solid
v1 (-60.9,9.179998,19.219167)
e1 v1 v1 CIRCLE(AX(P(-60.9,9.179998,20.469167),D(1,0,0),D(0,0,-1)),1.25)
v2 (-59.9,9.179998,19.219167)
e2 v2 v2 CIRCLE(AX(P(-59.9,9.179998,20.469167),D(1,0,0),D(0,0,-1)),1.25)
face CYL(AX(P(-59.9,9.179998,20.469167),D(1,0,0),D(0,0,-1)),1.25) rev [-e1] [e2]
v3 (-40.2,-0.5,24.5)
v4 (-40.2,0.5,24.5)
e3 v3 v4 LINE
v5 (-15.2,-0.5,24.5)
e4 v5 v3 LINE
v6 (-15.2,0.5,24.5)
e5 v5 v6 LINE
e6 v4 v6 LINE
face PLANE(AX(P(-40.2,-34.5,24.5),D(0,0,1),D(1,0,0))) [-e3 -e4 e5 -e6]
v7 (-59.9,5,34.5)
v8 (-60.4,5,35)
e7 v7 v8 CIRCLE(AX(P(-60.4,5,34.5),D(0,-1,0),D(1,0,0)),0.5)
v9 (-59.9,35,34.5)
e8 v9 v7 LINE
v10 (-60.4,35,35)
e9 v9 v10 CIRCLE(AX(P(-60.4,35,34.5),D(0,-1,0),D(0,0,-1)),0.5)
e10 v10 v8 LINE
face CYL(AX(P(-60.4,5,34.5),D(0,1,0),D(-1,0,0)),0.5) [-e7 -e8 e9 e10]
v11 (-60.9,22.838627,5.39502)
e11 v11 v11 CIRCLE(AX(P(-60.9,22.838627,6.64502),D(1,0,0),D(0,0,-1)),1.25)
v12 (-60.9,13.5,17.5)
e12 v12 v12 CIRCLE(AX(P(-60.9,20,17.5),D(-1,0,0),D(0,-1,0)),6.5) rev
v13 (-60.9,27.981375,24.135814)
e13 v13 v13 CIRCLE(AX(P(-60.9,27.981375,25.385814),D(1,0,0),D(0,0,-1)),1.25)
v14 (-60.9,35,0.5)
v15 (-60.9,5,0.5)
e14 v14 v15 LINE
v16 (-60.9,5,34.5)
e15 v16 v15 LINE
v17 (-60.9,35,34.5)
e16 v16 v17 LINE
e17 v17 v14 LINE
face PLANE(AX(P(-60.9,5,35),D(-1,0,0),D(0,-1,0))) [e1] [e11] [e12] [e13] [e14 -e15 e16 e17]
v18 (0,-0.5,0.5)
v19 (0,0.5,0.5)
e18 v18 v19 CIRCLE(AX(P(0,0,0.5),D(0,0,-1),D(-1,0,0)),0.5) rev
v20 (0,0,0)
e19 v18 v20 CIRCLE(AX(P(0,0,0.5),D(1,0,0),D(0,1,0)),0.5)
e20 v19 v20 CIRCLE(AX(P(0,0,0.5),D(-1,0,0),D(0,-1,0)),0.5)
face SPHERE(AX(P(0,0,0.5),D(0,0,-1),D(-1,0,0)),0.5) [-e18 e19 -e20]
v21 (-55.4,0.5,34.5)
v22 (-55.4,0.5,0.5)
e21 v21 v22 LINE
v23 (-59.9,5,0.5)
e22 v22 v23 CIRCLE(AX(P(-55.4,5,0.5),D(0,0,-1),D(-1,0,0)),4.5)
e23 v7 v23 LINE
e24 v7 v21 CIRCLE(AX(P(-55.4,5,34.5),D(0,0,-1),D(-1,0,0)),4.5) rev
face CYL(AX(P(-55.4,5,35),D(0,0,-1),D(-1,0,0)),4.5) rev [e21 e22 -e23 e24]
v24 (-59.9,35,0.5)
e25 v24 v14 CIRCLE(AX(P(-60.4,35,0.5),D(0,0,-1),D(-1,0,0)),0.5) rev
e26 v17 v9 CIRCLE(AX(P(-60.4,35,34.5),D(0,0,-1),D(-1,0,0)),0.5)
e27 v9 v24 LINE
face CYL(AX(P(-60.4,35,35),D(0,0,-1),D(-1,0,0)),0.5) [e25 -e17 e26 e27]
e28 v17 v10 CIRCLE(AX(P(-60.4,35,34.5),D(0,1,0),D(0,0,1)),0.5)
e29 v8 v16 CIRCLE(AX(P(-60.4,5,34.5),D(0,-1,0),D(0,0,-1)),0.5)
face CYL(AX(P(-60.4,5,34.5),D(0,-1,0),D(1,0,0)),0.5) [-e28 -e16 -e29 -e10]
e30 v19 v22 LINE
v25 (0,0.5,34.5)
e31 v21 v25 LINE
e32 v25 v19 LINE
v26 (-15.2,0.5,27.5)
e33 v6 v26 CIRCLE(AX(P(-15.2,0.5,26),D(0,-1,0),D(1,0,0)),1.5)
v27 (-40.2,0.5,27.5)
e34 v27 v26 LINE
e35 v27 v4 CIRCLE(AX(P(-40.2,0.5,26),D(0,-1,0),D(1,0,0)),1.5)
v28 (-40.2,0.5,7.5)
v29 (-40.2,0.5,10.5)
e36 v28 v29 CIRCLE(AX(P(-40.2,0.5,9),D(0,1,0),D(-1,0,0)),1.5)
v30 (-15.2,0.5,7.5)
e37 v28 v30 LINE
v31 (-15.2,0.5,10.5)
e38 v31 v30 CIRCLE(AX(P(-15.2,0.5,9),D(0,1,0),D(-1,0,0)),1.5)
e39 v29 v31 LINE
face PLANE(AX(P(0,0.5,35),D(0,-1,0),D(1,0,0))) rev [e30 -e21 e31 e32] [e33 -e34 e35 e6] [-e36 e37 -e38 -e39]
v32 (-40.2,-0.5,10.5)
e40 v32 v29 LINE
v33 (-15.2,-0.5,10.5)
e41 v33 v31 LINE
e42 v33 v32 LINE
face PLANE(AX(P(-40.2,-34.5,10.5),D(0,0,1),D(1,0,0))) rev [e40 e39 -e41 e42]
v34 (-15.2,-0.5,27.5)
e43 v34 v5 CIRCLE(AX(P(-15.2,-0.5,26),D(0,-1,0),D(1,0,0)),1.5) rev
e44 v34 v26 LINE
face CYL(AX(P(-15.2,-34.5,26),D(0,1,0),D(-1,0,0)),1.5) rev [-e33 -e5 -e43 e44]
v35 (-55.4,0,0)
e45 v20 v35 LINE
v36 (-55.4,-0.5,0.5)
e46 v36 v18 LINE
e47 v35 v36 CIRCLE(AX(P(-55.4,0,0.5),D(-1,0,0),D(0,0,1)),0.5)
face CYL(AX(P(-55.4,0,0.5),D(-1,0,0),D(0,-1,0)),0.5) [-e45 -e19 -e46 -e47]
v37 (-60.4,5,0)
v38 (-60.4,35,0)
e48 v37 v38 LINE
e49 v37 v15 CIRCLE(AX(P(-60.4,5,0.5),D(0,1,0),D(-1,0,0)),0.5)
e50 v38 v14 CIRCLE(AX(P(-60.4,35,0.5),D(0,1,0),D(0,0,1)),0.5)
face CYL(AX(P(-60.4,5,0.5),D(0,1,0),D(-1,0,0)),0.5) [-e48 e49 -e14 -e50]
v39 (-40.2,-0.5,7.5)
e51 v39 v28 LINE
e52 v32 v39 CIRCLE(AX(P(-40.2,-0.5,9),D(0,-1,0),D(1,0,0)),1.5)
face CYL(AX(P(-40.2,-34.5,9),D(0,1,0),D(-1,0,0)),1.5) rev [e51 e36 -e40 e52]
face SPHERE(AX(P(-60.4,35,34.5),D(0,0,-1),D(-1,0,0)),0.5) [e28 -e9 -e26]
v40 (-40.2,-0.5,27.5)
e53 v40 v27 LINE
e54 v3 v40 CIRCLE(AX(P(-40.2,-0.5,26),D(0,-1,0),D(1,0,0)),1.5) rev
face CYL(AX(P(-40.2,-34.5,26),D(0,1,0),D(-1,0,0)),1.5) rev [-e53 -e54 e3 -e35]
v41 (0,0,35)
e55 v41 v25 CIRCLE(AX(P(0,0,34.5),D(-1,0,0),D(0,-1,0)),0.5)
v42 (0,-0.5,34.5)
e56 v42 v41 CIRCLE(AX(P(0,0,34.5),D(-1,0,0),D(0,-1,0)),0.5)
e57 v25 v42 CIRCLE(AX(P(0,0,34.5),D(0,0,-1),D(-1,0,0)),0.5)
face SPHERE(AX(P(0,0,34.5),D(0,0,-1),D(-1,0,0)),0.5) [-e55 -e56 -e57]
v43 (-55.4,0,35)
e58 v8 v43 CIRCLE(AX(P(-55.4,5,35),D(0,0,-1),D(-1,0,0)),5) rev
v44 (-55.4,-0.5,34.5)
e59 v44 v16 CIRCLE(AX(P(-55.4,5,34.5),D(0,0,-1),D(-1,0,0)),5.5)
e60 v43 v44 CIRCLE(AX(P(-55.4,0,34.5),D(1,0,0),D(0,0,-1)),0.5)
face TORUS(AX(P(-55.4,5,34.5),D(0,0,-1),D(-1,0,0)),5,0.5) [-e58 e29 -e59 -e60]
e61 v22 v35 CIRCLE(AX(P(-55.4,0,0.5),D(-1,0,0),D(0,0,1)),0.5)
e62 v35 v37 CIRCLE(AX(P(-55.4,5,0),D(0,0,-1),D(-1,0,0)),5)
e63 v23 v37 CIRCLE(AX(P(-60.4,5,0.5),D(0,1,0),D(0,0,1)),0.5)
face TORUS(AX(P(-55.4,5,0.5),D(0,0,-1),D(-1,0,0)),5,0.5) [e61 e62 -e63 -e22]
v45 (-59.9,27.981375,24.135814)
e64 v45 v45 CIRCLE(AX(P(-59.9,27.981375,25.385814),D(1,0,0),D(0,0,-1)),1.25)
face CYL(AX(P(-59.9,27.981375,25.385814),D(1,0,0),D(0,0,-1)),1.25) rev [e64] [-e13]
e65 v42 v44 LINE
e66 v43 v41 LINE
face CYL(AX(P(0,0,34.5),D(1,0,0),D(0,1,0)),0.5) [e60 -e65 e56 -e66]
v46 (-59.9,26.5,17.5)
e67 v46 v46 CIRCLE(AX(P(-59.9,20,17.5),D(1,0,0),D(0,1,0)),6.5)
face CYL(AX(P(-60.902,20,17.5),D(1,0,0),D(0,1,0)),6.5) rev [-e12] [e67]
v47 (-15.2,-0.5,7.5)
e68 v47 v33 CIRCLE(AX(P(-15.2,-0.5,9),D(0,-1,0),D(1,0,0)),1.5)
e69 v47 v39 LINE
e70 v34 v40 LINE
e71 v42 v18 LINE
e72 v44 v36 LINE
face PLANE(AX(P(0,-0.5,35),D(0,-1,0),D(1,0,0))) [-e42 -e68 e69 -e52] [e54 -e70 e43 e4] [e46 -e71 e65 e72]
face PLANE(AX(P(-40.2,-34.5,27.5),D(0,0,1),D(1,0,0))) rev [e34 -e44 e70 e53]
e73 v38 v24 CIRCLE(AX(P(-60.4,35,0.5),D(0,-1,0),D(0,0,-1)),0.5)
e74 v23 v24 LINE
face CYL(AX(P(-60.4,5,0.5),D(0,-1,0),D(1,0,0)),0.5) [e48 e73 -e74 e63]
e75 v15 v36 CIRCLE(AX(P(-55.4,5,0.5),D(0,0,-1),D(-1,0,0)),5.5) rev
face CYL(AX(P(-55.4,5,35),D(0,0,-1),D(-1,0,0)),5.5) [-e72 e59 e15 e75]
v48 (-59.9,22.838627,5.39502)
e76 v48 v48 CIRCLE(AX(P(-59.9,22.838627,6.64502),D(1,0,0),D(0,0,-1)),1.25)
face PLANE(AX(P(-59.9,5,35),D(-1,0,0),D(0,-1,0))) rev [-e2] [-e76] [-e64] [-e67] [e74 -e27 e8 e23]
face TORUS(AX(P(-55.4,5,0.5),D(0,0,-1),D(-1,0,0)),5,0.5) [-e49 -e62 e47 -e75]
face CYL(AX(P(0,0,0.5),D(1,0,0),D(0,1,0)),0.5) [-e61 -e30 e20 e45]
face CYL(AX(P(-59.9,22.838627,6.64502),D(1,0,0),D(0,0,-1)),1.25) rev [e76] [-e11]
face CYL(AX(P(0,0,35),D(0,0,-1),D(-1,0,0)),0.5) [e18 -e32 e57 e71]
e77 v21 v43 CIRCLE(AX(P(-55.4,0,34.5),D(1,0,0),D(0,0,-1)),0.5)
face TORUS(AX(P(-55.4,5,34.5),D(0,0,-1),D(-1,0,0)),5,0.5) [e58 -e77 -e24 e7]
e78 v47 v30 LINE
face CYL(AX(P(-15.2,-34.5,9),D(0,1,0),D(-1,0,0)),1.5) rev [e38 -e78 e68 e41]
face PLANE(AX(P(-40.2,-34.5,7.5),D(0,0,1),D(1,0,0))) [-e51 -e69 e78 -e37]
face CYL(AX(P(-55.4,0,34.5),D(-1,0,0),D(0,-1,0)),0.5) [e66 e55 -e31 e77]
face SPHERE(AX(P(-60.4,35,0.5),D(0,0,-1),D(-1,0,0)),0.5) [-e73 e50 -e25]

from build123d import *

# Parameters (mm, degrees)
BOSS_EXTRUDE1_DEPTH   = 35
CUT_EXTRUDE1_REACH    = 80.316
SKETCH3_R             = 6.5
FILLET1_R             = 0.5
CUT_EXTRUDE3_DEPTH    = 35
F_2_5MM_DOWEL_HOLE1_D = 2.5


with BuildPart() as part:
    # Sketch1 → Boss-Extrude1 (new body)
    with BuildSketch(Plane.XY):
        with BuildLine():
            Line((0, 0.5), (-55.4, 0.5))
            ThreePointArc((-55.4, 0.5), (-58.581980515, 1.818019485), (-59.9, 5))
            Line((-59.9, 5), (-59.9, 35))
            ThreePointArc((-59.9, 35), (-60.4, 35.5), (-60.9, 35))
            Line((-60.9, 35), (-60.9, 5))
            ThreePointArc((-60.9, 5), (-59.289087297, 1.110912703), (-55.4, -0.5))
            Line((-55.4, -0.5), (0, -0.5))
            ThreePointArc((0, -0.5), (0.5, 0), (0, 0.5))
        make_face()
    extrude(amount=BOSS_EXTRUDE1_DEPTH)

    # Sketch3 → Cut-Extrude1 (cut, up to next)
    with BuildSketch(Plane(origin=(-59.9, 0, 0), x_dir=(0, 0, -1), z_dir=(1, 0, 0)), mode=Mode.PRIVATE) as cut_extrude1_sk1:
        with Locations(Location((-17.5, 20, 0), (0, 0, 90))):
            Circle(SKETCH3_R)
    cut_extrude1_tool1 = extrude(cut_extrude1_sk1.sketch, amount=-CUT_EXTRUDE1_REACH, mode=Mode.PRIVATE) & part.part
    add(cut_extrude1_tool1.solids().sort_by_distance((-59.9, 20, 17.5))[0], mode=Mode.SUBTRACT)

    # Fillet1
    fillet1_edges = [part.edges().sort_by_distance(p)[0] for p in [
        (-60.9, 20, 0),
        (-60.4, 35.5, 0),
        (-59.9, 20, 0),
        (-58.581980515, 1.818019485, 0),
        (-60.4, 35.5, 35),
        (-60.9, 20, 35),
        (-59.289087297, 1.110912703, 35),
        (-27.7, -0.5, 35),
        (0.5, 0, 35),
        (-27.7, 0.5, 35),
        (-58.581980515, 1.818019485, 35),
        (-27.7, 0.5, 0),
        (-59.9, 20, 35),
        (0.5, 0, 0),
        (-27.7, -0.5, 0),
        (-59.289087297, 1.110912703, 0),
    ]]
    fillet(fillet1_edges, radius=FILLET1_R - 0.0001)  # a hair under: the kernel refuses the full size

    # Sketch6 → Cut-Extrude3 (cut)
    with BuildSketch(Plane(origin=(0, 0.5, 0), x_dir=(1, 0, 0), z_dir=(0, 1, 0))):
        with BuildLine():
            Line((-40.2, -7.5), (-15.2, -7.5))
            ThreePointArc((-15.2, -7.5), (-13.7, -9), (-15.2, -10.5))
            Line((-15.2, -10.5), (-40.2, -10.5))
            ThreePointArc((-40.2, -10.5), (-41.7, -9), (-40.2, -7.5))
        make_face()
        with BuildLine():
            Line((-40.2, -27.5), (-15.2, -27.5))
            ThreePointArc((-15.2, -27.5), (-13.7, -26), (-15.2, -24.5))
            Line((-15.2, -24.5), (-40.2, -24.5))
            ThreePointArc((-40.2, -24.5), (-41.7, -26), (-40.2, -27.5))
        make_face()
    extrude(amount=-CUT_EXTRUDE3_DEPTH, mode=Mode.SUBTRACT)

    # Ø2.5mm Dowel Hole1 (through all)
    with Locations(Plane(origin=(-59.9, 27.981374836, 25.385813574), x_dir=(0, 1, 0), z_dir=(1, 0, 0))):
        with Locations((0, 0), (-18.801377139, -4.916646995), (-5.14274737, -18.740793726)):
            Hole(F_2_5MM_DOWEL_HOLE1_D / 2)


solid = part.part
